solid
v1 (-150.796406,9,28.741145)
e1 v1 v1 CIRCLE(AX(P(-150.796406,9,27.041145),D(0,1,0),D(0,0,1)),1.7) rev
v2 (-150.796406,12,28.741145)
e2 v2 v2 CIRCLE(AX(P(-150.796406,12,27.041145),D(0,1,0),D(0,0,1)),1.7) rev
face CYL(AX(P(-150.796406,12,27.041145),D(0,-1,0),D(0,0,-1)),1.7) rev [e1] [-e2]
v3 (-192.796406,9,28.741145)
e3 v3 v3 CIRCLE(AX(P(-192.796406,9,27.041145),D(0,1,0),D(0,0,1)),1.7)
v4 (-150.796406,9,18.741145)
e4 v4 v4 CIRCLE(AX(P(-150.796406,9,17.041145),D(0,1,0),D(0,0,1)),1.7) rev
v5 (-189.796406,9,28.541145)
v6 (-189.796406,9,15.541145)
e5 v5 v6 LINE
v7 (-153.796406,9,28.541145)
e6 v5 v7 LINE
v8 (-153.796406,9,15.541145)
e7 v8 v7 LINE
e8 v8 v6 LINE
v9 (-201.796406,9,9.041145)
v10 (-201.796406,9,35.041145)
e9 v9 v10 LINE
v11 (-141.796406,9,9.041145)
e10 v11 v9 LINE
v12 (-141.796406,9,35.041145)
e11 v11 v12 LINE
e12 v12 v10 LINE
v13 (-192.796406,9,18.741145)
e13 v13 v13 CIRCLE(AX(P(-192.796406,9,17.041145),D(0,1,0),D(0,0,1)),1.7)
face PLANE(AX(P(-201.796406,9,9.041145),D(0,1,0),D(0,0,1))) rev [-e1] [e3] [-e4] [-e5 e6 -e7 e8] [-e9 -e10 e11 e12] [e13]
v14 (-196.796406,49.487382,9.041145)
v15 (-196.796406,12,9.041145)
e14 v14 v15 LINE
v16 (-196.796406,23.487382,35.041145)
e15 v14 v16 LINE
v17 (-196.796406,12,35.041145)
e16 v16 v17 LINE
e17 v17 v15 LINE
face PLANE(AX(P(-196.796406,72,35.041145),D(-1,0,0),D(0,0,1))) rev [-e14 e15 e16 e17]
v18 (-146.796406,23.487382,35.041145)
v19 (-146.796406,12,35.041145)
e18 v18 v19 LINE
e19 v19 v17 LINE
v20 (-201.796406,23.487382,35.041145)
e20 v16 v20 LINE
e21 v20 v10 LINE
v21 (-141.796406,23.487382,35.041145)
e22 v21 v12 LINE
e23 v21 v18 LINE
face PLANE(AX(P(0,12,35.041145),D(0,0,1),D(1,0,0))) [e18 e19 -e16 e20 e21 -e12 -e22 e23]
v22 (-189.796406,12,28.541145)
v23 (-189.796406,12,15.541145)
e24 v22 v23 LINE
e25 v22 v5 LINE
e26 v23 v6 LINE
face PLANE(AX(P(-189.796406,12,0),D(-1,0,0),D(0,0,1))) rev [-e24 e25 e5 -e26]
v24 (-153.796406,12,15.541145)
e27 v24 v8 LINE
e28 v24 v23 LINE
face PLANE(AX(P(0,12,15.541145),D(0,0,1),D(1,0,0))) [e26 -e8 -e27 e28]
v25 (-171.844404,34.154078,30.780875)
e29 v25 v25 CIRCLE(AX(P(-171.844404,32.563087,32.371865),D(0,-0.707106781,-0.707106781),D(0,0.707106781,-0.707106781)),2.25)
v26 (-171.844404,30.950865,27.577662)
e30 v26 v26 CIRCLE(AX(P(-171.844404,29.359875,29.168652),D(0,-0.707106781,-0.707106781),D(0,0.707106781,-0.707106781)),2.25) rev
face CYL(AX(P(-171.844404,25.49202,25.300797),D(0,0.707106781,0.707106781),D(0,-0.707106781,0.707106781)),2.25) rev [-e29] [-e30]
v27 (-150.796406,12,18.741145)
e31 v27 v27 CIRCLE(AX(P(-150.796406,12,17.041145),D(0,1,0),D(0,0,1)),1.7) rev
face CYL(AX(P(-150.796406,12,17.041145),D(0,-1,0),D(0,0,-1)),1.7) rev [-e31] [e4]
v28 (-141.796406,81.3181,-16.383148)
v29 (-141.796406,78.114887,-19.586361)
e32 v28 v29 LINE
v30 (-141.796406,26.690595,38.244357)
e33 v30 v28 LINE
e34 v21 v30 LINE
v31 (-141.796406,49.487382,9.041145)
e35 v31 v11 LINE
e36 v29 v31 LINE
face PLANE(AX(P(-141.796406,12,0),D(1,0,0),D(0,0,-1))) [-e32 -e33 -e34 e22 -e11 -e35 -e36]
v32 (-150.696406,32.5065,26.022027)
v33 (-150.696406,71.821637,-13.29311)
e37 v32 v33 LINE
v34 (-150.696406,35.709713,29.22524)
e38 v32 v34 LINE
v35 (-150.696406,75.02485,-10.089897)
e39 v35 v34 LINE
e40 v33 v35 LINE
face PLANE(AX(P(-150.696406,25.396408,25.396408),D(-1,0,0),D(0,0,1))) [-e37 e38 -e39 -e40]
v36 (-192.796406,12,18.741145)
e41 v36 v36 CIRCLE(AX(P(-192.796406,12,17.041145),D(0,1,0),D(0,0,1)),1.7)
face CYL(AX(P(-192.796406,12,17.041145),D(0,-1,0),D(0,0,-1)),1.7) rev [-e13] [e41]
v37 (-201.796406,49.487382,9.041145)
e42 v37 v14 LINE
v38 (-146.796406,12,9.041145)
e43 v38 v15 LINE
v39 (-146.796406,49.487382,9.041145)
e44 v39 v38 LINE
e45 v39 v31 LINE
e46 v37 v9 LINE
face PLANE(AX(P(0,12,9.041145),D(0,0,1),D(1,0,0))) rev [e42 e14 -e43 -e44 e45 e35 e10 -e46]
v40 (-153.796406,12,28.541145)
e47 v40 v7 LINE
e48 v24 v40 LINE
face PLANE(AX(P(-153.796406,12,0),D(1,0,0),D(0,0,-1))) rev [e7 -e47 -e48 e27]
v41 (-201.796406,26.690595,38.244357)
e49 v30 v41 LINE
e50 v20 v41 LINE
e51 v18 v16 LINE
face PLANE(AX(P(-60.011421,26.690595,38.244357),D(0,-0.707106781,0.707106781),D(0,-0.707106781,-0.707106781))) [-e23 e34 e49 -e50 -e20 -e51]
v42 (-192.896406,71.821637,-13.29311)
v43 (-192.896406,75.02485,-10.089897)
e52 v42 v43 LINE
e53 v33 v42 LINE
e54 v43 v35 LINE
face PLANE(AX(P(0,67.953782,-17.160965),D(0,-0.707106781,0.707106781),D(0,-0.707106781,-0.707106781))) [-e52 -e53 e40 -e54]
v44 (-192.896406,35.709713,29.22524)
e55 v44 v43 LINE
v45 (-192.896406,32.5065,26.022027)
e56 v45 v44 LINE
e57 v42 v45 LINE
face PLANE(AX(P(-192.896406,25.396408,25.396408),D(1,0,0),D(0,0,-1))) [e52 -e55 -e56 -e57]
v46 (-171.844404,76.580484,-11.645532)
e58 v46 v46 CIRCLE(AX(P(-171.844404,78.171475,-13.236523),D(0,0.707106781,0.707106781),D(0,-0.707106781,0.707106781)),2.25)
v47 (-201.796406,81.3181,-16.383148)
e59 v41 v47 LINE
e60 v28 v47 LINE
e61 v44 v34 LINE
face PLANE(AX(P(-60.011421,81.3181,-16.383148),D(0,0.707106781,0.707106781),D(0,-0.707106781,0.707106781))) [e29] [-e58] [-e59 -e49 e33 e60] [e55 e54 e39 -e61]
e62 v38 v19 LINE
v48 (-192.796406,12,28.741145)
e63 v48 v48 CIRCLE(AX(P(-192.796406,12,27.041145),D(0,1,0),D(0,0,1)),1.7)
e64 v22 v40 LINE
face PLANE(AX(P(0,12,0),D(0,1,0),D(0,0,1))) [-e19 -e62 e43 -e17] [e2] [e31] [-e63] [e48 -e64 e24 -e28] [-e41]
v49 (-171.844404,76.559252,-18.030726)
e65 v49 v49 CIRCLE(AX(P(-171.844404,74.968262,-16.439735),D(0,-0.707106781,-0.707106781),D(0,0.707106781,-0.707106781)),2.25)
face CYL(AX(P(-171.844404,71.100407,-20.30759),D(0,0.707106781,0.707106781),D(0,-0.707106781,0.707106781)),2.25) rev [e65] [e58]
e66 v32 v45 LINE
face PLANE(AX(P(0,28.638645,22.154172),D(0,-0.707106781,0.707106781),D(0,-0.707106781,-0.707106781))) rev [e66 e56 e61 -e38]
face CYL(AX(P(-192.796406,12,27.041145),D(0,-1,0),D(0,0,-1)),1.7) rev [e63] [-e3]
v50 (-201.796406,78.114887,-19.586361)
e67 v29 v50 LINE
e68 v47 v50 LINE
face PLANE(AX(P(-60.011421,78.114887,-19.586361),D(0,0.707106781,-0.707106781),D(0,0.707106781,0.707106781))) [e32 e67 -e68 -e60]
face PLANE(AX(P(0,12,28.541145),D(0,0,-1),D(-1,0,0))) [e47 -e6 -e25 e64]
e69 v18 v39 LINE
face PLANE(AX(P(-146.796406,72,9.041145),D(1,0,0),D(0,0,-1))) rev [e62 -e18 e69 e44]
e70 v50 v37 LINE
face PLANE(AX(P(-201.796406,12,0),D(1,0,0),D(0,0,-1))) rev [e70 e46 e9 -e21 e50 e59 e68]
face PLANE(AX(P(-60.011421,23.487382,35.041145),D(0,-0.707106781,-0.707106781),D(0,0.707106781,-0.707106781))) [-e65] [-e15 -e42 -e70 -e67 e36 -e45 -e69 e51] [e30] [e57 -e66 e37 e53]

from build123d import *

# Parameters (mm, degrees)
SKETCH_1_W                  = 60
SKETCH_1_H                  = 26
SKETCH_1_R                  = 1.7
EXTRUDE_3_DEPTH             = 12
SKETCH_10_W                 = 5
SKETCH_10_H                 = 4
EXTRUDE_4_DEPTH             = 60
EXTRUDE_START               = -60
EXTRUDE_6_DEPTH             = 60
CUT_EXTRUDE_6_REACH         = 219.643
SKETCH_20_W                 = 5
SKETCH_20_H                 = 4
CUT_EXTRUDE_7_REACH         = 219.643
SKETCH_21_W                 = 5
SKETCH_21_H                 = 4
CUT_EXTRUDE_8_REACH         = 219.643
SKETCH_22_W                 = 5
SKETCH_22_H                 = 4
SKETCH_23_R                 = 2.25
CUT_EXTRUDE_9_DEPTH         = 10
EXTRUDE_8_REACH             = 218.77
SKETCH_24_W                 = 5
SKETCH_24_H                 = 18
EXTRUDE_8_DIRECTION_2_REACH = 218.77
EXTRUDE_START_2             = -146.796406348
EXTRUDE_9_DEPTH             = 5
SKETCH_28_W                 = 60
SKETCH_28_H                 = 9
CUT_EXTRUDE_10_DEPTH        = 26


with BuildPart() as part:
    # 草图1 → 凸台-拉伸3 (new body)
    with BuildSketch(Plane(origin=(0, 0, 0), x_dir=(1, 0, 0), z_dir=(0, 1, 0))):
        with Locations((-171.796406348, -22.041144508)):
            Rectangle(SKETCH_1_W, SKETCH_1_H)
        with Locations(Location((-150.796406348, -17.041144508, 0), (0, 0, 270))):
            Circle(SKETCH_1_R, mode=Mode.SUBTRACT)
        with Locations(Location((-150.796406348, -27.041144508, 0), (0, 0, 270))):
            Circle(SKETCH_1_R, mode=Mode.SUBTRACT)
        with Locations(Location((-192.796406348, -27.041144508, 0), (0, 0, 270))):
            Circle(SKETCH_1_R, mode=Mode.SUBTRACT)
        with Locations(Location((-198.796406348, -27.041144508, 0), (0, 0, 270))):
            Circle(SKETCH_1_R, mode=Mode.SUBTRACT)
        with Locations(Location((-198.796406348, -17.041144508, 0), (0, 0, 270))):
            Circle(SKETCH_1_R, mode=Mode.SUBTRACT)
        with Locations(Location((-192.796406348, -17.041144508, 0), (0, 0, 270))):
            Circle(SKETCH_1_R, mode=Mode.SUBTRACT)
        with Locations(Location((-144.796406348, -27.041144508, 0), (0, 0, 270))):
            Circle(SKETCH_1_R, mode=Mode.SUBTRACT)
        with Locations(Location((-144.796406348, -17.041144508, 0), (0, 0, 270))):
            Circle(SKETCH_1_R, mode=Mode.SUBTRACT)
        Polygon((-154.244576261, -28.541144508), (-153.796406348, -28.541144508), (-153.796406348, -27.585746487), (-153.796406348, -16.496542529), (-153.796406348, -15.541144508), (-154.244576261, -15.541144508), (-160.170728493, -15.541144508), (-183.422084204, -15.541144508), (-189.348236436, -15.541144508), (-189.796406348, -15.541144508), (-189.796406348, -16.496542529), (-189.796406348, -27.585746487), (-189.796406348, -28.541144508), (-189.348236436, -28.541144508), (-183.422084204, -28.541144508), (-160.170728493, -28.541144508), align=None, mode=Mode.SUBTRACT)
    extrude(amount=EXTRUDE_3_DEPTH)

    # 草图10 → 凸台-拉伸4 (add)
    with BuildSketch(Plane(origin=(0, 12, 0), x_dir=(1, 0, 0), z_dir=(0, 1, 0))):
        with Locations((-144.296406348, -11.041144508)):
            Rectangle(SKETCH_10_W, SKETCH_10_H)
        with Locations((-199.296406348, -11.041144508)):
            Rectangle(SKETCH_10_W, SKETCH_10_H)
        with Locations((-199.296406348, -33.041144508)):
            Rectangle(SKETCH_10_W, SKETCH_10_H)
        with Locations((-144.296406348, -33.041144508)):
            Rectangle(SKETCH_10_W, SKETCH_10_H)
    extrude(amount=EXTRUDE_4_DEPTH)

    # 草图16 → 凸台-拉伸6 (add)
    with BuildSketch(Plane.ZY.offset(201.796406348).offset(EXTRUDE_START)):
        Polygon((35.041144508, 23.487382081), (-19.586360532, 78.114887122), (-16.383147731, 81.318099924), (38.24435731, 26.690594883), align=None)
    extrude(amount=EXTRUDE_6_DEPTH)

    # 切除-拉伸6: up to this plane
    cut_extrude_6_end = Plane(origin=(-60.011420854, 81.318099924, -16.383147731), z_dir=(0, 0.707106781186548, 0.7071067811865472))
    # 草图20 → 切除-拉伸6 (cut, up to the surface)
    with BuildSketch(Plane(origin=(0, 72, 0), x_dir=(1, 0, 0), z_dir=(0, 1, 0)), mode=Mode.PRIVATE) as cut_extrude_6_sk1:
        with Locations((-199.296406348, -11.041144508)):
            Rectangle(SKETCH_20_W, SKETCH_20_H)
    cut_extrude_6_tool1 = split(extrude(cut_extrude_6_sk1.sketch, amount=-CUT_EXTRUDE_6_REACH, mode=Mode.PRIVATE), bisect_by=cut_extrude_6_end, keep=Keep.BOTH, mode=Mode.PRIVATE)
    add(cut_extrude_6_tool1.solids().sort_by_distance((-199.296406, 72, 11.041145))[0], mode=Mode.SUBTRACT)

    # 切除-拉伸7: up to this face of the body (flat: up to its plane)
    cut_extrude_7_end = Plane(part.part.faces().sort_by_distance((-171.967338534, 54.279900151, 10.655052042))[0])
    # 草图21 → 切除-拉伸7 (cut, up to the picked face)
    with BuildSketch(Plane(origin=(0, 72, 0), x_dir=(1, 0, 0), z_dir=(0, 1, 0)), mode=Mode.PRIVATE) as cut_extrude_7_sk1:
        with Locations((-199.296406348, -33.041144508)):
            Rectangle(SKETCH_21_W, SKETCH_21_H)
    cut_extrude_7_tool1 = split(extrude(cut_extrude_7_sk1.sketch, amount=-CUT_EXTRUDE_7_REACH, mode=Mode.PRIVATE), bisect_by=cut_extrude_7_end, keep=Keep.BOTH, mode=Mode.PRIVATE)
    add(cut_extrude_7_tool1.solids().sort_by(Axis((-199.296406, 72, 33.041145), (0, -1, 0)))[0], mode=Mode.SUBTRACT)

    # 切除-拉伸8: up to this face of the body (flat: up to its plane)
    cut_extrude_8_end = Plane(part.part.faces().sort_by_distance((-172.136158915, 54.141614108, 10.793338085))[0])
    # 草图22 → 切除-拉伸8 (cut, up to the picked face)
    with BuildSketch(Plane(origin=(0, 72, 0), x_dir=(1, 0, 0), z_dir=(0, 1, 0)), mode=Mode.PRIVATE) as cut_extrude_8_sk1:
        with Locations((-144.296406348, -11.041144508)):
            Rectangle(SKETCH_22_W, SKETCH_22_H)
    cut_extrude_8_tool1 = split(extrude(cut_extrude_8_sk1.sketch, amount=-CUT_EXTRUDE_8_REACH, mode=Mode.PRIVATE), bisect_by=cut_extrude_8_end, keep=Keep.BOTH, mode=Mode.PRIVATE)
    # 草图22 → 切除-拉伸8 (cut, up to the picked face)
    with BuildSketch(Plane(origin=(0, 72, 0), x_dir=(1, 0, 0), z_dir=(0, 1, 0)), mode=Mode.PRIVATE) as cut_extrude_8_sk2:
        with Locations((-144.296406348, -33.041144508)):
            Rectangle(SKETCH_22_W, SKETCH_22_H)
    cut_extrude_8_tool2 = split(extrude(cut_extrude_8_sk2.sketch, amount=-CUT_EXTRUDE_8_REACH, mode=Mode.PRIVATE), bisect_by=cut_extrude_8_end, keep=Keep.BOTH, mode=Mode.PRIVATE)
    add(cut_extrude_8_tool1.solids().sort_by(Axis((-144.296406, 72, 11.041145), (0, -1, 0)))[0], mode=Mode.SUBTRACT)
    add(cut_extrude_8_tool2.solids().sort_by(Axis((-144.296406, 72, 33.041145), (0, -1, 0)))[0], mode=Mode.SUBTRACT)

    # 草图23 → 切除-拉伸9 (cut)
    with BuildSketch(Plane(origin=(0, 32.467476097, 32.467476097), x_dir=(1, 0, 0), z_dir=(0, 0.7071067811865478, 0.7071067811865472))):
        Polygon((-150.696406348, 25.486333053), (-150.696406348, 4.585214747), (-192.896406348, 4.585214747), (-192.896406348, 25.486333053), (-192.896406348, 57.849143044), (-192.896406348, 60.185214747), (-150.696406348, 60.185214747), (-150.696406348, 57.849143044), align=None)
        with Locations(Location((-171.844403565, 64.635214747, 0), (0, 0, 270))):
            Circle(SKETCH_23_R)
        with Locations(Location((-171.844403565, 0.135214747, 0), (0, 0, 90))):
            Circle(SKETCH_23_R)
    extrude(amount=-CUT_EXTRUDE_9_DEPTH, mode=Mode.SUBTRACT)

    # 草图24 → 凸台-拉伸8 (add, up to next)
    with BuildSketch(Plane(origin=(0, 12, 0), x_dir=(1, 0, 0), z_dir=(0, 1, 0)), mode=Mode.PRIVATE) as extrude_8_sk1:
        with Locations((-199.296406348, -22.041144508)):
            Rectangle(SKETCH_24_W, SKETCH_24_H)
    extrude_8_tool1 = extrude(extrude_8_sk1.sketch, amount=EXTRUDE_8_REACH, mode=Mode.PRIVATE) - part.part
    add(extrude_8_tool1.solids().sort_by_distance((-199.296406, 12, 22.041145))[0])

    # 凸台-拉伸8 direction 2: up to this face of the body (flat: up to its plane)
    extrude_8_direction_2_end = Plane(part.part.faces().sort_by_distance((-142.450317657, 0, 22.041144508))[0])
    # 草图24 → 凸台-拉伸8 direction 2 (add, up to the picked face)
    with BuildSketch(Plane(origin=(0, 12, 0), x_dir=(1, 0, 0), z_dir=(0, 1, 0)), mode=Mode.PRIVATE) as extrude_8_direction_2_sk1:
        with Locations((-199.296406348, -22.041144508)):
            Rectangle(SKETCH_24_W, SKETCH_24_H)
    extrude_8_direction_2_tool1 = split(extrude(extrude_8_direction_2_sk1.sketch, amount=-EXTRUDE_8_DIRECTION_2_REACH, mode=Mode.PRIVATE), bisect_by=extrude_8_direction_2_end, keep=Keep.BOTH, mode=Mode.PRIVATE)
    add(extrude_8_direction_2_tool1.solids().sort_by(Axis((-199.296406, 12, 22.041145), (0, -1, 0)))[0])

    # 凸台-拉伸9: read off the stored shape, not the designer's step
    # 凸台-拉伸9 outline → 凸台-拉伸9 (add)
    with BuildSketch(Plane.YZ.offset(EXTRUDE_START_2)):
        Polygon((49.487382081, 9.041144508), (23.487382081, 35.041144508), (0, 35.041144508), (0, 9.041144508), align=None)
    extrude(amount=EXTRUDE_9_DEPTH)

    # 草图28 → 切除-拉伸10 (cut)
    with BuildSketch(Plane.XY.offset(35.041144508)):
        with Locations((-171.796406348, 4.5)):
            Rectangle(SKETCH_28_W, SKETCH_28_H)
    extrude(amount=-CUT_EXTRUDE_10_DEPTH, mode=Mode.SUBTRACT)


solid = part.part
